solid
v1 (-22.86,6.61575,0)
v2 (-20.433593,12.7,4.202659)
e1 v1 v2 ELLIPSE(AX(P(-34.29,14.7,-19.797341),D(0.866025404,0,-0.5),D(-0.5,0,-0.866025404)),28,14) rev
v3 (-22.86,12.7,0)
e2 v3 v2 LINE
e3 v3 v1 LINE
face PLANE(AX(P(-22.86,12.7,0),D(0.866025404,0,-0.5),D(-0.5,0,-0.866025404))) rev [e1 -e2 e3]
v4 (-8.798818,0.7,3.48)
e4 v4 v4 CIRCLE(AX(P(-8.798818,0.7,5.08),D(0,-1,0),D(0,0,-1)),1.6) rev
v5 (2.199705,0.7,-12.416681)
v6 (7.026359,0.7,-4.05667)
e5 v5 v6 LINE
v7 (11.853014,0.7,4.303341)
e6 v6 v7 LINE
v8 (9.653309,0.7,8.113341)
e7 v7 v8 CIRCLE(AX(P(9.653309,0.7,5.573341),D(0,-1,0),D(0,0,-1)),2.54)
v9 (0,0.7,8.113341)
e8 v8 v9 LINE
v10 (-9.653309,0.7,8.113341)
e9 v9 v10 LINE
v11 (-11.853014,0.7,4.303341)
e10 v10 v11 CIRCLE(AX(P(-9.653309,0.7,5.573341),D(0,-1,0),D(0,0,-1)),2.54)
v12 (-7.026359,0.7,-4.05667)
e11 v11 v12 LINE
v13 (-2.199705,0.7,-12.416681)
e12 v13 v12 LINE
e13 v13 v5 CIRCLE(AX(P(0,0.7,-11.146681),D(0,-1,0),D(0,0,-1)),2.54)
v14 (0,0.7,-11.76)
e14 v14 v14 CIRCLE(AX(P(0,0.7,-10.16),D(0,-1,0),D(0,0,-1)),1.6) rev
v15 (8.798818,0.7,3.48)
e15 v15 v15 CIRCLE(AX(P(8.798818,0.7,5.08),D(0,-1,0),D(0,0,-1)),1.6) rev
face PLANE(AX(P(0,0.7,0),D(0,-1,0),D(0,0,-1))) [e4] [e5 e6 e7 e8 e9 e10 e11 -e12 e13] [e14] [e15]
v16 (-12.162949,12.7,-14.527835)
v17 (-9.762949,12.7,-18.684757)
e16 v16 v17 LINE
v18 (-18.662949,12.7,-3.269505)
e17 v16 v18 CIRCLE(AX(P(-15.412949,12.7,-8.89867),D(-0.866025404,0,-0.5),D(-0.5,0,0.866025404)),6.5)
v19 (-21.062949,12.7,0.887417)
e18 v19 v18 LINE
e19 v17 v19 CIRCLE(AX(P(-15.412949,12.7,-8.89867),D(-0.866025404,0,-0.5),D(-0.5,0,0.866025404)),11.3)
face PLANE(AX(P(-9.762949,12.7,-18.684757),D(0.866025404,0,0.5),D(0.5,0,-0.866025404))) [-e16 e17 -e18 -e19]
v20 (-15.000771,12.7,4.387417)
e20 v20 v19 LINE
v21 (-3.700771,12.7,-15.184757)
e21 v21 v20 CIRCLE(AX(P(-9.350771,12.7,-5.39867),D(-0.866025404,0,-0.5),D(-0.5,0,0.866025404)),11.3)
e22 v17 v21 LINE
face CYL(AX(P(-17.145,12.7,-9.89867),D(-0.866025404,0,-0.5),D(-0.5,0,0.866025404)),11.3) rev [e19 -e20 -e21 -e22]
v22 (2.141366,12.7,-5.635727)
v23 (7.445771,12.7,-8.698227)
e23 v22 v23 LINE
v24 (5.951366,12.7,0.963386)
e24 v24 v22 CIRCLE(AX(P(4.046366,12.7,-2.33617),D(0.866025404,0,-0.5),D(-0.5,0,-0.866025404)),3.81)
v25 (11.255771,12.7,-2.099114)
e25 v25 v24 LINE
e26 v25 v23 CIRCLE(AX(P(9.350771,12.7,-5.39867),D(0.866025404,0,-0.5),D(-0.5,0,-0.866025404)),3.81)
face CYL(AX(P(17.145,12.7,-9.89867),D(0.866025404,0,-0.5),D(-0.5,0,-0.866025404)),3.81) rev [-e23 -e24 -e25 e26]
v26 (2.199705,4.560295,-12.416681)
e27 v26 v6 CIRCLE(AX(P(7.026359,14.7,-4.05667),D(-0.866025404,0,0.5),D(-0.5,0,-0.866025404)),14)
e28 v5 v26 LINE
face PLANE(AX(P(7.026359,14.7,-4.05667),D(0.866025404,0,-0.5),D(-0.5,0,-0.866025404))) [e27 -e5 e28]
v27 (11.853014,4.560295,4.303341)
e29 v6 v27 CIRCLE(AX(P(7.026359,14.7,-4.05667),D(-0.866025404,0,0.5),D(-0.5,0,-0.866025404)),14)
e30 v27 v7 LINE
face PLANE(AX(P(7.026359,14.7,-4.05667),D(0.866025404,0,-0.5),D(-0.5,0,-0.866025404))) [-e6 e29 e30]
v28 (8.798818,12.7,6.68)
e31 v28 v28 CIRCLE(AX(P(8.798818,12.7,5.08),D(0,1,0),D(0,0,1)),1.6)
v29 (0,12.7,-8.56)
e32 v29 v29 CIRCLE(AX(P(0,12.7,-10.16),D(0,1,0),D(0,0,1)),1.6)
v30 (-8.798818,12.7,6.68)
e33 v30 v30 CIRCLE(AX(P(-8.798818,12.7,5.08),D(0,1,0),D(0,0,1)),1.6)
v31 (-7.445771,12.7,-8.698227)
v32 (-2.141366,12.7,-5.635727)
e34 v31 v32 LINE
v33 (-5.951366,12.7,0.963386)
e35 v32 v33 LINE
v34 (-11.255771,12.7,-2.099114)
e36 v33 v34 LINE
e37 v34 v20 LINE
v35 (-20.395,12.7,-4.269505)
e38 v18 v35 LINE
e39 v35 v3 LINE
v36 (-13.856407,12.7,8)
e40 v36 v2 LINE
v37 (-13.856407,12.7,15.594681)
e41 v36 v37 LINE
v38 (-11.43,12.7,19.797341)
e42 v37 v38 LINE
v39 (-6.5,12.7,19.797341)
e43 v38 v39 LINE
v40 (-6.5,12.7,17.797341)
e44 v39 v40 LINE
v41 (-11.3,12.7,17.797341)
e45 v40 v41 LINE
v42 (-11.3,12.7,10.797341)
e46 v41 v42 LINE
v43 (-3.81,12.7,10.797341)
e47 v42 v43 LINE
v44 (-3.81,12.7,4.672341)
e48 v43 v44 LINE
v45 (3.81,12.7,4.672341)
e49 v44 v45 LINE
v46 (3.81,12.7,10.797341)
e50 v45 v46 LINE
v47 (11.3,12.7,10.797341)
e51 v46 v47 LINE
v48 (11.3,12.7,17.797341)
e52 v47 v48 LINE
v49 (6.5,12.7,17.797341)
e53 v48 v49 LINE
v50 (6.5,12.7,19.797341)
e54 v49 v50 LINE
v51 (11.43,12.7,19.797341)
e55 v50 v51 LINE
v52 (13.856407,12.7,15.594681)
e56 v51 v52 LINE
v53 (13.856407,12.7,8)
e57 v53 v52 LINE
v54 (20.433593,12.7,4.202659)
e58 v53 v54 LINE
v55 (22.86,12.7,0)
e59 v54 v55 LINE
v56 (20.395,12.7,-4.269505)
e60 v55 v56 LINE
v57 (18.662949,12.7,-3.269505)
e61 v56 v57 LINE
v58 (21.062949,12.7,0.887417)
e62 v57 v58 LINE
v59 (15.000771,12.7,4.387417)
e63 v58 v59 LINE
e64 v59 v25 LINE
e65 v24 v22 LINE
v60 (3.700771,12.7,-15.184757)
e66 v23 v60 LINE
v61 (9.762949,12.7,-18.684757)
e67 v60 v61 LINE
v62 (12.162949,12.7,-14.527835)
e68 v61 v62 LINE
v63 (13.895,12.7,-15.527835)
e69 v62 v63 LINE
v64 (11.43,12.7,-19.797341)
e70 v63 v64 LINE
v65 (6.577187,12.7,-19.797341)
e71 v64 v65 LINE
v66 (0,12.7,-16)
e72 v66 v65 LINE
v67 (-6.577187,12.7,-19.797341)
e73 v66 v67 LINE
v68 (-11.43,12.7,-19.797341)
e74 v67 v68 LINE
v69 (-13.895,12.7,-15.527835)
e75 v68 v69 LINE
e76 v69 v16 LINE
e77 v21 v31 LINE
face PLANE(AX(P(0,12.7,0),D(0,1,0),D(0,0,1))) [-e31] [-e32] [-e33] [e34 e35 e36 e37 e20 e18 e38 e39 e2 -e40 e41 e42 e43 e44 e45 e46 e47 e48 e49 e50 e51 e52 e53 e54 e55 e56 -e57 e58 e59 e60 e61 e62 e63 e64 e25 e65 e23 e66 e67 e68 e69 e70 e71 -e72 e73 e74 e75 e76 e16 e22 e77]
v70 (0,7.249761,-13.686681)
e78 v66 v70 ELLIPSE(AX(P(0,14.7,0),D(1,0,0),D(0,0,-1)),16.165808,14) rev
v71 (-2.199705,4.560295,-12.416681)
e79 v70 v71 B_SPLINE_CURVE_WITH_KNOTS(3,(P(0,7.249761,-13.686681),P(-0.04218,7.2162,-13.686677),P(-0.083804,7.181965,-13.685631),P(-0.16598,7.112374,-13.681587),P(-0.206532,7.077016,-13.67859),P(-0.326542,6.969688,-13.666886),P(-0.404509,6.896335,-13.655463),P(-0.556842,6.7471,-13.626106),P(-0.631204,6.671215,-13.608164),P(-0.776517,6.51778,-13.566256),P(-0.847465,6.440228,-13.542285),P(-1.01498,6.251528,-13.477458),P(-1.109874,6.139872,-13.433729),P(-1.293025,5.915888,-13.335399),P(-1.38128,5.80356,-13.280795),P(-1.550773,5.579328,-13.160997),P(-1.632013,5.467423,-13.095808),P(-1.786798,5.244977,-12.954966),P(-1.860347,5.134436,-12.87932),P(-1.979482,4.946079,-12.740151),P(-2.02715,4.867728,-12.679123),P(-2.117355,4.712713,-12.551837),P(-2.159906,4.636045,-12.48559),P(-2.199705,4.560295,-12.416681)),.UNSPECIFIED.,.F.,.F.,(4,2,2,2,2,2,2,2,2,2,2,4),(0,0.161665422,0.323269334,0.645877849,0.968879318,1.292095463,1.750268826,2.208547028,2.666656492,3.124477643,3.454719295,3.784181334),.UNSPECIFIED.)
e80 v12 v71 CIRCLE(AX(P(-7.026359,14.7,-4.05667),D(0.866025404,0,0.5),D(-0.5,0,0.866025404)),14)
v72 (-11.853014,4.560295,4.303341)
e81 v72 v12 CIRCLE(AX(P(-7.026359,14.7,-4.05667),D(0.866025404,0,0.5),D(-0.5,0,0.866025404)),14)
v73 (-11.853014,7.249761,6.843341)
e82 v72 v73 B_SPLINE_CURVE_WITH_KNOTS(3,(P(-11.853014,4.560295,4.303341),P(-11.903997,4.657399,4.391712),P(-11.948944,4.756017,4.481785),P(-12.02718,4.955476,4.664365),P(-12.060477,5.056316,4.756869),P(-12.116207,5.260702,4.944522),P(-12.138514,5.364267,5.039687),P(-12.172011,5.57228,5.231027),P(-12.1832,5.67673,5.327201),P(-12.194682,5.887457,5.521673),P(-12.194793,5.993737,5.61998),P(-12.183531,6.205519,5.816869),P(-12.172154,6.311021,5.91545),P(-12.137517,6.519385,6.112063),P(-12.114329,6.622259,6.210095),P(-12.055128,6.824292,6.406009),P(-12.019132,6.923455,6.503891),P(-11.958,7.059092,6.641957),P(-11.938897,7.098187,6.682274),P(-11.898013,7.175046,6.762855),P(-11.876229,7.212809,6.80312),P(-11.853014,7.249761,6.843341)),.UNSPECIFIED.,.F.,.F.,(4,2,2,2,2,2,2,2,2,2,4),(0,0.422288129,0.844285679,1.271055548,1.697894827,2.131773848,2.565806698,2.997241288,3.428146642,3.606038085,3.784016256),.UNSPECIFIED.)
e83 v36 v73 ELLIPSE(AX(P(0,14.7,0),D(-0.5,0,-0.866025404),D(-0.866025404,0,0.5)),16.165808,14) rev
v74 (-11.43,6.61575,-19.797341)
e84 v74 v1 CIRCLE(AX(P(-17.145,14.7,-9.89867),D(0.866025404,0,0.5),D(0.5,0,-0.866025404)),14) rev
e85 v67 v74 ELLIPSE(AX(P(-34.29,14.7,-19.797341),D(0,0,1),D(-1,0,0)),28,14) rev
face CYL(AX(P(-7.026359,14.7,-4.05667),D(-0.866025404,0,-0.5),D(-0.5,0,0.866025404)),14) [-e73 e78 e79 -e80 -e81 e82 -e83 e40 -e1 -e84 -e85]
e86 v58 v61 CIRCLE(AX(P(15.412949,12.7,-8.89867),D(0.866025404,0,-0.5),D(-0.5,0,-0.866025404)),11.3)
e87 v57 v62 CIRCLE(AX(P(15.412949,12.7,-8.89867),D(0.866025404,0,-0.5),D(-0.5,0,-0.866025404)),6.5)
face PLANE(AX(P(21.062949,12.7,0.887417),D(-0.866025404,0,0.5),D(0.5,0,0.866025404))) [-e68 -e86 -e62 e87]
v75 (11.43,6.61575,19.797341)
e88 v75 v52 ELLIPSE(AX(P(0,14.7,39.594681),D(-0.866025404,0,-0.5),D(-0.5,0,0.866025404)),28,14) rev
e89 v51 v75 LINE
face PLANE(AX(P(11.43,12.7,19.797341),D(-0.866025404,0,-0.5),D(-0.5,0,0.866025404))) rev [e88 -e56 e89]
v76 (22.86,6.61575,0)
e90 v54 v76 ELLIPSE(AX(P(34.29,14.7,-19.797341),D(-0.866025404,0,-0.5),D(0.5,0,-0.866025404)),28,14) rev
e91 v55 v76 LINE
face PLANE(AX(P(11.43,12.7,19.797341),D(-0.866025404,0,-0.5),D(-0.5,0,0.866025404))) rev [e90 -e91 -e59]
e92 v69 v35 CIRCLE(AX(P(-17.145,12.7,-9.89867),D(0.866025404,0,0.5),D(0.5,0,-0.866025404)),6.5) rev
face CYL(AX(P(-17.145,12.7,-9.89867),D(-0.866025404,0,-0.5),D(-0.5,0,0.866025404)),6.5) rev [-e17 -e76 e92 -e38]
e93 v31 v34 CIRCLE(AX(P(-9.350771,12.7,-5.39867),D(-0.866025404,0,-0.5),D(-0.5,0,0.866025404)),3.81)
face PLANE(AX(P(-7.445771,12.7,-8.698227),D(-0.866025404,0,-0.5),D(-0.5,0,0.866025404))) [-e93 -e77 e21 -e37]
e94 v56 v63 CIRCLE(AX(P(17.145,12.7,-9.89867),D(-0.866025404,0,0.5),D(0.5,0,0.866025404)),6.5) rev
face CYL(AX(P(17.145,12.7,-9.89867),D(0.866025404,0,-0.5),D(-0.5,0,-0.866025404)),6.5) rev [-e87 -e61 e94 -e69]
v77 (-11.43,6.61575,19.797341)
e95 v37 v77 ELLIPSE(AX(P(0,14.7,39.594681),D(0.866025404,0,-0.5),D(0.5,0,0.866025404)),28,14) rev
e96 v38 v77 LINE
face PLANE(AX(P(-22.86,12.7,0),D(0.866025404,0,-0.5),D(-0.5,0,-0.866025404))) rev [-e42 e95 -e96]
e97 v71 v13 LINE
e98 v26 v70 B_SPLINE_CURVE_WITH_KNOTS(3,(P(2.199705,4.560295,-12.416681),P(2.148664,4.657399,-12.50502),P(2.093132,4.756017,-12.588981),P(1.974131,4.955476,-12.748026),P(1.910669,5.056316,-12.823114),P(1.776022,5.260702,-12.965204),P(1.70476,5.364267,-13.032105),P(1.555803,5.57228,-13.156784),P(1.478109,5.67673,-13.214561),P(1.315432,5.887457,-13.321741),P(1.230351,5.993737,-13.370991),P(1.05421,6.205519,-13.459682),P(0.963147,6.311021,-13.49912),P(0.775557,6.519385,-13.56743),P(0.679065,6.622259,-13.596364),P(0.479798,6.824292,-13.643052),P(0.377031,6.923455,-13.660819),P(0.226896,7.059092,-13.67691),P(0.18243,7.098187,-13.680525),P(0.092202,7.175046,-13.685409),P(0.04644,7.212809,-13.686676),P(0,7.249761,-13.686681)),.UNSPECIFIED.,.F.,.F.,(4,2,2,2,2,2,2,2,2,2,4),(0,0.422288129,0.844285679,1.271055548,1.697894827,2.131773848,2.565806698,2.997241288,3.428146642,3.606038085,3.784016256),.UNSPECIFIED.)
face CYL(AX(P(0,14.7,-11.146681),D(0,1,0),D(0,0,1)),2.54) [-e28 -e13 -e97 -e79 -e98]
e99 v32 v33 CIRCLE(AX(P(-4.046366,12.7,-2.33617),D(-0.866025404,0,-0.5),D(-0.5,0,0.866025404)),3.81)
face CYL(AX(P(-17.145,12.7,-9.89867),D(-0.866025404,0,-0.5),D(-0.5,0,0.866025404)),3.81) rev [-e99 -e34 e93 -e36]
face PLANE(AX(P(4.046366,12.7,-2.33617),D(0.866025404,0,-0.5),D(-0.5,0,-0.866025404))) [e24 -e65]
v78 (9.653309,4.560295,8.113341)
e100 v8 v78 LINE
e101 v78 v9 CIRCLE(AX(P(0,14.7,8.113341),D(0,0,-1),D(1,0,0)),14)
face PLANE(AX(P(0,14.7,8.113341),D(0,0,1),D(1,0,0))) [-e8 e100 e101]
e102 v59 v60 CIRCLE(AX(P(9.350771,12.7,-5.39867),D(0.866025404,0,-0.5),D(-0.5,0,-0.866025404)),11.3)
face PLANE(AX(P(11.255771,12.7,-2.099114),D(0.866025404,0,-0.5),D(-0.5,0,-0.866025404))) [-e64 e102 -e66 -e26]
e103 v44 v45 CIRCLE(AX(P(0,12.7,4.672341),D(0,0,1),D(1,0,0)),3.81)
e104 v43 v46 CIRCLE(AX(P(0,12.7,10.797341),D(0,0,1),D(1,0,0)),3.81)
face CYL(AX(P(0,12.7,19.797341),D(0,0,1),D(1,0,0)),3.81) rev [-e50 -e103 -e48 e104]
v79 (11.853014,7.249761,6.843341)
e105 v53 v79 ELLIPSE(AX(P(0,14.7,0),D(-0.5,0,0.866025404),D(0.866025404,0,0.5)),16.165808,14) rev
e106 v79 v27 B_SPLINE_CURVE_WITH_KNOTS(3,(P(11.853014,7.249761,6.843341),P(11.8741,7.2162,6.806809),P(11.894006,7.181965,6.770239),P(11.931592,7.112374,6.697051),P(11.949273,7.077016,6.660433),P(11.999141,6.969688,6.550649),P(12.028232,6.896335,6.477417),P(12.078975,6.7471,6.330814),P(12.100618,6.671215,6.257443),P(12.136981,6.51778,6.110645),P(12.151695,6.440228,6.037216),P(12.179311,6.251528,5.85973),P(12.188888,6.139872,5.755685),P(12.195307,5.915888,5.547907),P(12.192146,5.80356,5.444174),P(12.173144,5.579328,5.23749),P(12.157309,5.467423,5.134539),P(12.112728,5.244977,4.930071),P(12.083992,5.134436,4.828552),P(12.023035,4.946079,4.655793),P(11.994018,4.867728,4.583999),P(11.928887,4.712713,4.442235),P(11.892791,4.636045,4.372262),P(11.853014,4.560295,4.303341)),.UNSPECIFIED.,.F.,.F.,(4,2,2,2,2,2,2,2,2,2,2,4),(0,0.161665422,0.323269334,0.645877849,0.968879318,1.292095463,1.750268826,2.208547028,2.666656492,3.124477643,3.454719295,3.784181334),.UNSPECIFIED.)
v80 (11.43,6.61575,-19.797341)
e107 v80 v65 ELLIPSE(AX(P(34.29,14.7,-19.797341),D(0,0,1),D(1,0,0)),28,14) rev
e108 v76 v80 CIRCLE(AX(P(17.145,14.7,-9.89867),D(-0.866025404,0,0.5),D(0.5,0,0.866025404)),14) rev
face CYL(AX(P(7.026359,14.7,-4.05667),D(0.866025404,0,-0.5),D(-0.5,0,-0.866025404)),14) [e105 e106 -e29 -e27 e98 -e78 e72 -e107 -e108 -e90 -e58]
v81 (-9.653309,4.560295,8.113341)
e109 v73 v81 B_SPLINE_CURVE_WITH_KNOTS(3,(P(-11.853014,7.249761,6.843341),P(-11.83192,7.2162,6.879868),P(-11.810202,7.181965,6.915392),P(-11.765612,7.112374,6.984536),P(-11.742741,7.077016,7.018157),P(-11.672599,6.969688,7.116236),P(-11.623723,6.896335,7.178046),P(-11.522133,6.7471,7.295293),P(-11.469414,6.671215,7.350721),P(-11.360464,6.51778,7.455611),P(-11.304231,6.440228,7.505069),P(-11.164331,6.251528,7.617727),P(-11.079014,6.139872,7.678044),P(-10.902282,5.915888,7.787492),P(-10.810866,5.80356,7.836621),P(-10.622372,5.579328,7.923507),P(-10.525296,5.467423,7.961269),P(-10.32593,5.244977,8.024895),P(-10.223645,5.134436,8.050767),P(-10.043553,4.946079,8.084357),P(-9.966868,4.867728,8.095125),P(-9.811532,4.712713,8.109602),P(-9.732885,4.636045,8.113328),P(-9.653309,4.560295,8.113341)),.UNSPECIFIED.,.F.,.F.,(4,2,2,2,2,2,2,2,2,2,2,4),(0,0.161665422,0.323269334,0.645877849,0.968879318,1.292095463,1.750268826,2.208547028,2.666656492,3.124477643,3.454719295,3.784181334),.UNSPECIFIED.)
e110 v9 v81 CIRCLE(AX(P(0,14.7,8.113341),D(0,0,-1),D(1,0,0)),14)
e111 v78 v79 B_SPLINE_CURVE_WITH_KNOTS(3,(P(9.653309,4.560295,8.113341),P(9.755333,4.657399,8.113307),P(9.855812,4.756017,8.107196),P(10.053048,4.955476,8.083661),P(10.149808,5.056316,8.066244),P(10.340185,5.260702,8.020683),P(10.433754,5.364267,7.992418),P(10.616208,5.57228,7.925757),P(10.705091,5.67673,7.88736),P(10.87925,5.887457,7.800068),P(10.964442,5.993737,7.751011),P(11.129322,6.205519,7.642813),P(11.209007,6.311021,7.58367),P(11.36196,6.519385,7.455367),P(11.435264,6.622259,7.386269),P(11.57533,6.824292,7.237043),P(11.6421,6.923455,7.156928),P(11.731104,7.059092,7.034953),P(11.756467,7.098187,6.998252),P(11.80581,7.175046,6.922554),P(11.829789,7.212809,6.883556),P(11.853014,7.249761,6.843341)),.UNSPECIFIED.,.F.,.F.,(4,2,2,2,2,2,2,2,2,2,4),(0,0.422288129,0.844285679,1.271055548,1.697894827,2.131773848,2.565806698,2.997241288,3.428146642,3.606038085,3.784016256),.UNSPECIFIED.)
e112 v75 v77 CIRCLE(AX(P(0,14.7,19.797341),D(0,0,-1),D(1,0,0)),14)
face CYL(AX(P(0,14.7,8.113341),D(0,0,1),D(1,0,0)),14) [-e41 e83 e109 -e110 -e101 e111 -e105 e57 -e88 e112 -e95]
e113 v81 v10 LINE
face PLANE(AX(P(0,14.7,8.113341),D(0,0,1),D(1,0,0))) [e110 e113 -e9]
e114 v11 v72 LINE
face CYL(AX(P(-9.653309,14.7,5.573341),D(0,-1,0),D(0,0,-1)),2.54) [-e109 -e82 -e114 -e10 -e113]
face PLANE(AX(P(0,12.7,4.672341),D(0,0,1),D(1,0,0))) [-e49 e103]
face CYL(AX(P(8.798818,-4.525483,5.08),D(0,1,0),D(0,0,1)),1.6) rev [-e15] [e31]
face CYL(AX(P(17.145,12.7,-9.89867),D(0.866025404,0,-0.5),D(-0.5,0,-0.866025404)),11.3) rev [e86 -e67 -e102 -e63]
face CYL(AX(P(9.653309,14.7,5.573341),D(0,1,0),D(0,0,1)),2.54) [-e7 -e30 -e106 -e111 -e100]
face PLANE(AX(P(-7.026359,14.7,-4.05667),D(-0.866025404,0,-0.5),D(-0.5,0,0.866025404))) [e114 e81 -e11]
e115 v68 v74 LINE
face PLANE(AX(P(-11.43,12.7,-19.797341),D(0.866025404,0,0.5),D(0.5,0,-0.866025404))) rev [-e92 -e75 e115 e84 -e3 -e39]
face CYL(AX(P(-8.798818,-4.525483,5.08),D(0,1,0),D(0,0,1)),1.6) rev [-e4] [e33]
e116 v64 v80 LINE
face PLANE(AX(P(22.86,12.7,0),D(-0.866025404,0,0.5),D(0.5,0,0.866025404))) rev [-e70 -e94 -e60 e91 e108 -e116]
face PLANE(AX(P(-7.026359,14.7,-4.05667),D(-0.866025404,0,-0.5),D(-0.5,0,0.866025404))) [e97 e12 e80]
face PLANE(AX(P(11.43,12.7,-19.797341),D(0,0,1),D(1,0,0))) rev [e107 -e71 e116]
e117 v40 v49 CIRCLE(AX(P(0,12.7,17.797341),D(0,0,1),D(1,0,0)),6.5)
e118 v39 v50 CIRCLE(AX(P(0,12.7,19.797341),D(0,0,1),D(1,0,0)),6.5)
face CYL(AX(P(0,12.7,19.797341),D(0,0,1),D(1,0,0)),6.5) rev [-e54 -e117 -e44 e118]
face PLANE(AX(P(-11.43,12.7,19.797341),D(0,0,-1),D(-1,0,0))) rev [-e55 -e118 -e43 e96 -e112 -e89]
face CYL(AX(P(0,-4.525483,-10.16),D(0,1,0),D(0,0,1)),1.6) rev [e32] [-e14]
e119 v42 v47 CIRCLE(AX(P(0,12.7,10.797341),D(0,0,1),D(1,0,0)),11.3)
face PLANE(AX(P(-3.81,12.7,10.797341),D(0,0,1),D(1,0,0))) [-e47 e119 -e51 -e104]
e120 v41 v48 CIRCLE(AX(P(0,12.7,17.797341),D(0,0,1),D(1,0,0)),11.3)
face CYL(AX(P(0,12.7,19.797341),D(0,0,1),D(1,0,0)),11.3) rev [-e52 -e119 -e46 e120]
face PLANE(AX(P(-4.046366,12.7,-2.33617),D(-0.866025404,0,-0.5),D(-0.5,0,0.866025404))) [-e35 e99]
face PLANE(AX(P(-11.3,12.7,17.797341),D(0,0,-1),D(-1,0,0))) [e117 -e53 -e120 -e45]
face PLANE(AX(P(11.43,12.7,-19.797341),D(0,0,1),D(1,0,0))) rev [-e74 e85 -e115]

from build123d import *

# Parameters (mm, degrees)
BOSS_EXTRUDE1_DEPTH = 12.7
SKETCH7_R           = 1.6
CUT_EXTRUDE2_DEPTH  = 12.7
CIRPATTERN1_COUNT   = 3
CUT_EXTRUDE3_DEPTH  = 11.684
CIRPATTERN2_COUNT   = 3
CUT_EXTRUDE5_DEPTH  = 0.7
FILLET2_R           = 2.54


with BuildPart() as part:
    # Sketch1 → Boss-Extrude1 (new body)
    with BuildSketch(Plane(origin=(0, 0, 0), x_dir=(1, 0, 0), z_dir=(0, 1, 0))):
        Polygon((11.43, -19.797340731), (22.86, 0), (11.43, 19.797340731), (-11.43, 19.797340731), (-22.86, 0), (-11.43, -19.797340731), align=None)
    extrude(amount=BOSS_EXTRUDE1_DEPTH)

    # Sketch5 → Cut-Revolve1 (revolve, cut)
    with BuildSketch(Plane(origin=(0, 12.7, 0), x_dir=(1, 0, 0), z_dir=(0, 1, 0))):
        Polygon((0, -19.797340731), (0, -4.672340739), (-3.81, -4.672340739), (-3.81, -10.797340731), (-11.300000006, -10.797340731), (-11.300000006, -17.797340731), (-6.5, -17.797340731), (-6.5, -19.797340731), align=None)
    cut_revolve1 = revolve(axis=Axis((0, 12.7, 19.797340731), (0, 0, -1)), mode=Mode.SUBTRACT)

    # Sketch7 → Cut-Extrude2 (cut)
    with BuildSketch(Plane(origin=(0, 12.7, 0), x_dir=(1, 0, 0), z_dir=(0, 1, 0))):
        with Locations(Location((0, 10.16, 0), (0, 0, 270))):
            Circle(SKETCH7_R)
        with Locations(Location((8.798818102, -5.08, 0), (0, 0, 270))):
            Circle(SKETCH7_R)
        with Locations(Location((-8.798818102, -5.08, 0), (0, 0, 270))):
            Circle(SKETCH7_R)
    extrude(amount=-CUT_EXTRUDE2_DEPTH, mode=Mode.SUBTRACT)

    # CirPattern1: Cut-Revolve1 ×3 about axis
    cirpattern1_axis = Axis((0, 0, 0), (0, 1, 0))
    for i in range(1, CIRPATTERN1_COUNT):
        add(cut_revolve1.rotate(cirpattern1_axis, i * 360 / CIRPATTERN1_COUNT), mode=Mode.SUBTRACT)

    # Sketch8 → Cut-Extrude3 (cut)
    with BuildSketch(Plane.XY.offset(19.797340731)):
        with BuildLine():
            Line((-13.856406592, 12.7), (-18.662949192, 12.7))
            Line((-18.662949192, 12.7), (-18.662949192, 0))
            Line((-18.662949192, 0), (18.662949192, 0))
            Line((18.662949192, 0), (18.662949192, 12.7))
            Line((18.662949192, 12.7), (13.856406592, 12.7))
            ThreePointArc((13.856406592, 12.7), (0, 0.69999987), (-13.856406592, 12.7))
        make_face()
    cut_extrude3 = extrude(amount=-CUT_EXTRUDE3_DEPTH, mode=Mode.SUBTRACT)

    # CirPattern2: Cut-Extrude3 ×3 about axis
    cirpattern2_axis = Axis((0, 0, 0), (0, 1, 0))
    for i in range(1, CIRPATTERN2_COUNT):
        add(cut_extrude3.rotate(cirpattern2_axis, i * 360 / CIRPATTERN2_COUNT), mode=Mode.SUBTRACT)

    # Sketch10 → Cut-Extrude5 (cut)
    with BuildSketch(Plane.XZ):
        Polygon((14.052718364, 8.113340731), (-14.052718364, 8.113340731), (0, -16.226681461), align=None)
    extrude(amount=-CUT_EXTRUDE5_DEPTH, mode=Mode.SUBTRACT)

    # Fillet2
    # the kernel refuses this fillet: 2.54 mm, written as the material it takes off along each edge
    with BuildSketch(Plane(origin=(14.052718364, -10.298522628, 8.113340731), x_dir=(-0.4999999999999996, 0, -0.8660254037844387), z_dir=(0, 1, 0))) as fillet2_piece_1_section:
        with BuildLine():
            CenterArc((FILLET2_R * 1.73205080757, FILLET2_R), FILLET2_R, 150, 120)
            Line((FILLET2_R * 0.866025403784, FILLET2_R * 1.5), (0, 0))
            Line((0, 0), (FILLET2_R * 1.73205080757, 0))
        make_face()
    fillet2_piece_1 = extrude(amount=33.997045256, mode=Mode.PRIVATE)
    fillet2_piece_1 = fillet2_piece_1 - Plane(origin=(6.277314066, 14.7, -3.624208966), x_dir=(-0.49487165940112743, -0.14285714153061227, -0.8571428573086736), z_dir=(0.8660254037844388, 0, -0.49999999999999983)) * Cylinder(14.00000013, 86, mode=Mode.PRIVATE)
    fillet2_piece_1 = fillet2_piece_1 - Plane(origin=(0, 14.7, 7.248417919), x_dir=(0.9897433188022552, -0.14285714153061224, 0), z_dir=(0, 0, 1)) * Cylinder(14.00000013, 86, mode=Mode.PRIVATE)
    add(fillet2_piece_1, mode=Mode.SUBTRACT)
    with BuildSketch(Plane(origin=(0, -10.298522628, -16.226681461), x_dir=(-0.5000000000000003, 0, 0.8660254037844386), z_dir=(0, 1, 0))) as fillet2_piece_2_section:
        with BuildLine():
            CenterArc((FILLET2_R * 1.73205080757, FILLET2_R), FILLET2_R, 150, 120)
            Line((FILLET2_R * 0.866025403784, FILLET2_R * 1.5), (0, 0))
            Line((0, 0), (FILLET2_R * 1.73205080757, 0))
        make_face()
    fillet2_piece_2 = extrude(amount=33.997045256, mode=Mode.PRIVATE)
    fillet2_piece_2 = fillet2_piece_2 - Plane(origin=(6.277314055, 14.7, -3.62420896), x_dir=(-0.49487165940112743, -0.14285714153061227, -0.8571428573086736), z_dir=(0.8660254037844388, 0, -0.49999999999999983)) * Cylinder(14.00000013, 86, mode=Mode.PRIVATE)
    fillet2_piece_2 = fillet2_piece_2 - Plane(origin=(-6.277314066, 14.7, -3.624208966), x_dir=(-0.4948716594011281, -0.14285714153061227, 0.8571428573086732), z_dir=(-0.8660254037844384, 0, -0.5000000000000004)) * Cylinder(14.00000013, 86, mode=Mode.PRIVATE)
    add(fillet2_piece_2, mode=Mode.SUBTRACT)
    with BuildSketch(Plane(origin=(-14.052718364, 23.698522628, 8.113340731), x_dir=(1, 0, 0), z_dir=(0, -1, 0))) as fillet2_piece_3_section:
        with BuildLine():
            CenterArc((FILLET2_R * 1.73205080757, -FILLET2_R), FILLET2_R, 90, 120)
            Line((FILLET2_R * 0.866025403784, -FILLET2_R * 1.5), (0, 0))
            Line((0, 0), (FILLET2_R * 1.73205080757, 0))
        make_face()
    fillet2_piece_3 = extrude(amount=33.997045256, mode=Mode.PRIVATE)
    fillet2_piece_3 = fillet2_piece_3 - Plane(origin=(0, 14.7, 7.248417932), x_dir=(0.9897433188022552, -0.14285714153061224, 0), z_dir=(0, 0, 1)) * Cylinder(14.00000013, 86, mode=Mode.PRIVATE)
    fillet2_piece_3 = fillet2_piece_3 - Plane(origin=(-6.277314055, 14.7, -3.62420896), x_dir=(-0.4948716594011281, -0.14285714153061227, 0.8571428573086732), z_dir=(-0.8660254037844384, 0, -0.5000000000000004)) * Cylinder(14.00000013, 86, mode=Mode.PRIVATE)
    add(fillet2_piece_3, mode=Mode.SUBTRACT)


solid = part.part
